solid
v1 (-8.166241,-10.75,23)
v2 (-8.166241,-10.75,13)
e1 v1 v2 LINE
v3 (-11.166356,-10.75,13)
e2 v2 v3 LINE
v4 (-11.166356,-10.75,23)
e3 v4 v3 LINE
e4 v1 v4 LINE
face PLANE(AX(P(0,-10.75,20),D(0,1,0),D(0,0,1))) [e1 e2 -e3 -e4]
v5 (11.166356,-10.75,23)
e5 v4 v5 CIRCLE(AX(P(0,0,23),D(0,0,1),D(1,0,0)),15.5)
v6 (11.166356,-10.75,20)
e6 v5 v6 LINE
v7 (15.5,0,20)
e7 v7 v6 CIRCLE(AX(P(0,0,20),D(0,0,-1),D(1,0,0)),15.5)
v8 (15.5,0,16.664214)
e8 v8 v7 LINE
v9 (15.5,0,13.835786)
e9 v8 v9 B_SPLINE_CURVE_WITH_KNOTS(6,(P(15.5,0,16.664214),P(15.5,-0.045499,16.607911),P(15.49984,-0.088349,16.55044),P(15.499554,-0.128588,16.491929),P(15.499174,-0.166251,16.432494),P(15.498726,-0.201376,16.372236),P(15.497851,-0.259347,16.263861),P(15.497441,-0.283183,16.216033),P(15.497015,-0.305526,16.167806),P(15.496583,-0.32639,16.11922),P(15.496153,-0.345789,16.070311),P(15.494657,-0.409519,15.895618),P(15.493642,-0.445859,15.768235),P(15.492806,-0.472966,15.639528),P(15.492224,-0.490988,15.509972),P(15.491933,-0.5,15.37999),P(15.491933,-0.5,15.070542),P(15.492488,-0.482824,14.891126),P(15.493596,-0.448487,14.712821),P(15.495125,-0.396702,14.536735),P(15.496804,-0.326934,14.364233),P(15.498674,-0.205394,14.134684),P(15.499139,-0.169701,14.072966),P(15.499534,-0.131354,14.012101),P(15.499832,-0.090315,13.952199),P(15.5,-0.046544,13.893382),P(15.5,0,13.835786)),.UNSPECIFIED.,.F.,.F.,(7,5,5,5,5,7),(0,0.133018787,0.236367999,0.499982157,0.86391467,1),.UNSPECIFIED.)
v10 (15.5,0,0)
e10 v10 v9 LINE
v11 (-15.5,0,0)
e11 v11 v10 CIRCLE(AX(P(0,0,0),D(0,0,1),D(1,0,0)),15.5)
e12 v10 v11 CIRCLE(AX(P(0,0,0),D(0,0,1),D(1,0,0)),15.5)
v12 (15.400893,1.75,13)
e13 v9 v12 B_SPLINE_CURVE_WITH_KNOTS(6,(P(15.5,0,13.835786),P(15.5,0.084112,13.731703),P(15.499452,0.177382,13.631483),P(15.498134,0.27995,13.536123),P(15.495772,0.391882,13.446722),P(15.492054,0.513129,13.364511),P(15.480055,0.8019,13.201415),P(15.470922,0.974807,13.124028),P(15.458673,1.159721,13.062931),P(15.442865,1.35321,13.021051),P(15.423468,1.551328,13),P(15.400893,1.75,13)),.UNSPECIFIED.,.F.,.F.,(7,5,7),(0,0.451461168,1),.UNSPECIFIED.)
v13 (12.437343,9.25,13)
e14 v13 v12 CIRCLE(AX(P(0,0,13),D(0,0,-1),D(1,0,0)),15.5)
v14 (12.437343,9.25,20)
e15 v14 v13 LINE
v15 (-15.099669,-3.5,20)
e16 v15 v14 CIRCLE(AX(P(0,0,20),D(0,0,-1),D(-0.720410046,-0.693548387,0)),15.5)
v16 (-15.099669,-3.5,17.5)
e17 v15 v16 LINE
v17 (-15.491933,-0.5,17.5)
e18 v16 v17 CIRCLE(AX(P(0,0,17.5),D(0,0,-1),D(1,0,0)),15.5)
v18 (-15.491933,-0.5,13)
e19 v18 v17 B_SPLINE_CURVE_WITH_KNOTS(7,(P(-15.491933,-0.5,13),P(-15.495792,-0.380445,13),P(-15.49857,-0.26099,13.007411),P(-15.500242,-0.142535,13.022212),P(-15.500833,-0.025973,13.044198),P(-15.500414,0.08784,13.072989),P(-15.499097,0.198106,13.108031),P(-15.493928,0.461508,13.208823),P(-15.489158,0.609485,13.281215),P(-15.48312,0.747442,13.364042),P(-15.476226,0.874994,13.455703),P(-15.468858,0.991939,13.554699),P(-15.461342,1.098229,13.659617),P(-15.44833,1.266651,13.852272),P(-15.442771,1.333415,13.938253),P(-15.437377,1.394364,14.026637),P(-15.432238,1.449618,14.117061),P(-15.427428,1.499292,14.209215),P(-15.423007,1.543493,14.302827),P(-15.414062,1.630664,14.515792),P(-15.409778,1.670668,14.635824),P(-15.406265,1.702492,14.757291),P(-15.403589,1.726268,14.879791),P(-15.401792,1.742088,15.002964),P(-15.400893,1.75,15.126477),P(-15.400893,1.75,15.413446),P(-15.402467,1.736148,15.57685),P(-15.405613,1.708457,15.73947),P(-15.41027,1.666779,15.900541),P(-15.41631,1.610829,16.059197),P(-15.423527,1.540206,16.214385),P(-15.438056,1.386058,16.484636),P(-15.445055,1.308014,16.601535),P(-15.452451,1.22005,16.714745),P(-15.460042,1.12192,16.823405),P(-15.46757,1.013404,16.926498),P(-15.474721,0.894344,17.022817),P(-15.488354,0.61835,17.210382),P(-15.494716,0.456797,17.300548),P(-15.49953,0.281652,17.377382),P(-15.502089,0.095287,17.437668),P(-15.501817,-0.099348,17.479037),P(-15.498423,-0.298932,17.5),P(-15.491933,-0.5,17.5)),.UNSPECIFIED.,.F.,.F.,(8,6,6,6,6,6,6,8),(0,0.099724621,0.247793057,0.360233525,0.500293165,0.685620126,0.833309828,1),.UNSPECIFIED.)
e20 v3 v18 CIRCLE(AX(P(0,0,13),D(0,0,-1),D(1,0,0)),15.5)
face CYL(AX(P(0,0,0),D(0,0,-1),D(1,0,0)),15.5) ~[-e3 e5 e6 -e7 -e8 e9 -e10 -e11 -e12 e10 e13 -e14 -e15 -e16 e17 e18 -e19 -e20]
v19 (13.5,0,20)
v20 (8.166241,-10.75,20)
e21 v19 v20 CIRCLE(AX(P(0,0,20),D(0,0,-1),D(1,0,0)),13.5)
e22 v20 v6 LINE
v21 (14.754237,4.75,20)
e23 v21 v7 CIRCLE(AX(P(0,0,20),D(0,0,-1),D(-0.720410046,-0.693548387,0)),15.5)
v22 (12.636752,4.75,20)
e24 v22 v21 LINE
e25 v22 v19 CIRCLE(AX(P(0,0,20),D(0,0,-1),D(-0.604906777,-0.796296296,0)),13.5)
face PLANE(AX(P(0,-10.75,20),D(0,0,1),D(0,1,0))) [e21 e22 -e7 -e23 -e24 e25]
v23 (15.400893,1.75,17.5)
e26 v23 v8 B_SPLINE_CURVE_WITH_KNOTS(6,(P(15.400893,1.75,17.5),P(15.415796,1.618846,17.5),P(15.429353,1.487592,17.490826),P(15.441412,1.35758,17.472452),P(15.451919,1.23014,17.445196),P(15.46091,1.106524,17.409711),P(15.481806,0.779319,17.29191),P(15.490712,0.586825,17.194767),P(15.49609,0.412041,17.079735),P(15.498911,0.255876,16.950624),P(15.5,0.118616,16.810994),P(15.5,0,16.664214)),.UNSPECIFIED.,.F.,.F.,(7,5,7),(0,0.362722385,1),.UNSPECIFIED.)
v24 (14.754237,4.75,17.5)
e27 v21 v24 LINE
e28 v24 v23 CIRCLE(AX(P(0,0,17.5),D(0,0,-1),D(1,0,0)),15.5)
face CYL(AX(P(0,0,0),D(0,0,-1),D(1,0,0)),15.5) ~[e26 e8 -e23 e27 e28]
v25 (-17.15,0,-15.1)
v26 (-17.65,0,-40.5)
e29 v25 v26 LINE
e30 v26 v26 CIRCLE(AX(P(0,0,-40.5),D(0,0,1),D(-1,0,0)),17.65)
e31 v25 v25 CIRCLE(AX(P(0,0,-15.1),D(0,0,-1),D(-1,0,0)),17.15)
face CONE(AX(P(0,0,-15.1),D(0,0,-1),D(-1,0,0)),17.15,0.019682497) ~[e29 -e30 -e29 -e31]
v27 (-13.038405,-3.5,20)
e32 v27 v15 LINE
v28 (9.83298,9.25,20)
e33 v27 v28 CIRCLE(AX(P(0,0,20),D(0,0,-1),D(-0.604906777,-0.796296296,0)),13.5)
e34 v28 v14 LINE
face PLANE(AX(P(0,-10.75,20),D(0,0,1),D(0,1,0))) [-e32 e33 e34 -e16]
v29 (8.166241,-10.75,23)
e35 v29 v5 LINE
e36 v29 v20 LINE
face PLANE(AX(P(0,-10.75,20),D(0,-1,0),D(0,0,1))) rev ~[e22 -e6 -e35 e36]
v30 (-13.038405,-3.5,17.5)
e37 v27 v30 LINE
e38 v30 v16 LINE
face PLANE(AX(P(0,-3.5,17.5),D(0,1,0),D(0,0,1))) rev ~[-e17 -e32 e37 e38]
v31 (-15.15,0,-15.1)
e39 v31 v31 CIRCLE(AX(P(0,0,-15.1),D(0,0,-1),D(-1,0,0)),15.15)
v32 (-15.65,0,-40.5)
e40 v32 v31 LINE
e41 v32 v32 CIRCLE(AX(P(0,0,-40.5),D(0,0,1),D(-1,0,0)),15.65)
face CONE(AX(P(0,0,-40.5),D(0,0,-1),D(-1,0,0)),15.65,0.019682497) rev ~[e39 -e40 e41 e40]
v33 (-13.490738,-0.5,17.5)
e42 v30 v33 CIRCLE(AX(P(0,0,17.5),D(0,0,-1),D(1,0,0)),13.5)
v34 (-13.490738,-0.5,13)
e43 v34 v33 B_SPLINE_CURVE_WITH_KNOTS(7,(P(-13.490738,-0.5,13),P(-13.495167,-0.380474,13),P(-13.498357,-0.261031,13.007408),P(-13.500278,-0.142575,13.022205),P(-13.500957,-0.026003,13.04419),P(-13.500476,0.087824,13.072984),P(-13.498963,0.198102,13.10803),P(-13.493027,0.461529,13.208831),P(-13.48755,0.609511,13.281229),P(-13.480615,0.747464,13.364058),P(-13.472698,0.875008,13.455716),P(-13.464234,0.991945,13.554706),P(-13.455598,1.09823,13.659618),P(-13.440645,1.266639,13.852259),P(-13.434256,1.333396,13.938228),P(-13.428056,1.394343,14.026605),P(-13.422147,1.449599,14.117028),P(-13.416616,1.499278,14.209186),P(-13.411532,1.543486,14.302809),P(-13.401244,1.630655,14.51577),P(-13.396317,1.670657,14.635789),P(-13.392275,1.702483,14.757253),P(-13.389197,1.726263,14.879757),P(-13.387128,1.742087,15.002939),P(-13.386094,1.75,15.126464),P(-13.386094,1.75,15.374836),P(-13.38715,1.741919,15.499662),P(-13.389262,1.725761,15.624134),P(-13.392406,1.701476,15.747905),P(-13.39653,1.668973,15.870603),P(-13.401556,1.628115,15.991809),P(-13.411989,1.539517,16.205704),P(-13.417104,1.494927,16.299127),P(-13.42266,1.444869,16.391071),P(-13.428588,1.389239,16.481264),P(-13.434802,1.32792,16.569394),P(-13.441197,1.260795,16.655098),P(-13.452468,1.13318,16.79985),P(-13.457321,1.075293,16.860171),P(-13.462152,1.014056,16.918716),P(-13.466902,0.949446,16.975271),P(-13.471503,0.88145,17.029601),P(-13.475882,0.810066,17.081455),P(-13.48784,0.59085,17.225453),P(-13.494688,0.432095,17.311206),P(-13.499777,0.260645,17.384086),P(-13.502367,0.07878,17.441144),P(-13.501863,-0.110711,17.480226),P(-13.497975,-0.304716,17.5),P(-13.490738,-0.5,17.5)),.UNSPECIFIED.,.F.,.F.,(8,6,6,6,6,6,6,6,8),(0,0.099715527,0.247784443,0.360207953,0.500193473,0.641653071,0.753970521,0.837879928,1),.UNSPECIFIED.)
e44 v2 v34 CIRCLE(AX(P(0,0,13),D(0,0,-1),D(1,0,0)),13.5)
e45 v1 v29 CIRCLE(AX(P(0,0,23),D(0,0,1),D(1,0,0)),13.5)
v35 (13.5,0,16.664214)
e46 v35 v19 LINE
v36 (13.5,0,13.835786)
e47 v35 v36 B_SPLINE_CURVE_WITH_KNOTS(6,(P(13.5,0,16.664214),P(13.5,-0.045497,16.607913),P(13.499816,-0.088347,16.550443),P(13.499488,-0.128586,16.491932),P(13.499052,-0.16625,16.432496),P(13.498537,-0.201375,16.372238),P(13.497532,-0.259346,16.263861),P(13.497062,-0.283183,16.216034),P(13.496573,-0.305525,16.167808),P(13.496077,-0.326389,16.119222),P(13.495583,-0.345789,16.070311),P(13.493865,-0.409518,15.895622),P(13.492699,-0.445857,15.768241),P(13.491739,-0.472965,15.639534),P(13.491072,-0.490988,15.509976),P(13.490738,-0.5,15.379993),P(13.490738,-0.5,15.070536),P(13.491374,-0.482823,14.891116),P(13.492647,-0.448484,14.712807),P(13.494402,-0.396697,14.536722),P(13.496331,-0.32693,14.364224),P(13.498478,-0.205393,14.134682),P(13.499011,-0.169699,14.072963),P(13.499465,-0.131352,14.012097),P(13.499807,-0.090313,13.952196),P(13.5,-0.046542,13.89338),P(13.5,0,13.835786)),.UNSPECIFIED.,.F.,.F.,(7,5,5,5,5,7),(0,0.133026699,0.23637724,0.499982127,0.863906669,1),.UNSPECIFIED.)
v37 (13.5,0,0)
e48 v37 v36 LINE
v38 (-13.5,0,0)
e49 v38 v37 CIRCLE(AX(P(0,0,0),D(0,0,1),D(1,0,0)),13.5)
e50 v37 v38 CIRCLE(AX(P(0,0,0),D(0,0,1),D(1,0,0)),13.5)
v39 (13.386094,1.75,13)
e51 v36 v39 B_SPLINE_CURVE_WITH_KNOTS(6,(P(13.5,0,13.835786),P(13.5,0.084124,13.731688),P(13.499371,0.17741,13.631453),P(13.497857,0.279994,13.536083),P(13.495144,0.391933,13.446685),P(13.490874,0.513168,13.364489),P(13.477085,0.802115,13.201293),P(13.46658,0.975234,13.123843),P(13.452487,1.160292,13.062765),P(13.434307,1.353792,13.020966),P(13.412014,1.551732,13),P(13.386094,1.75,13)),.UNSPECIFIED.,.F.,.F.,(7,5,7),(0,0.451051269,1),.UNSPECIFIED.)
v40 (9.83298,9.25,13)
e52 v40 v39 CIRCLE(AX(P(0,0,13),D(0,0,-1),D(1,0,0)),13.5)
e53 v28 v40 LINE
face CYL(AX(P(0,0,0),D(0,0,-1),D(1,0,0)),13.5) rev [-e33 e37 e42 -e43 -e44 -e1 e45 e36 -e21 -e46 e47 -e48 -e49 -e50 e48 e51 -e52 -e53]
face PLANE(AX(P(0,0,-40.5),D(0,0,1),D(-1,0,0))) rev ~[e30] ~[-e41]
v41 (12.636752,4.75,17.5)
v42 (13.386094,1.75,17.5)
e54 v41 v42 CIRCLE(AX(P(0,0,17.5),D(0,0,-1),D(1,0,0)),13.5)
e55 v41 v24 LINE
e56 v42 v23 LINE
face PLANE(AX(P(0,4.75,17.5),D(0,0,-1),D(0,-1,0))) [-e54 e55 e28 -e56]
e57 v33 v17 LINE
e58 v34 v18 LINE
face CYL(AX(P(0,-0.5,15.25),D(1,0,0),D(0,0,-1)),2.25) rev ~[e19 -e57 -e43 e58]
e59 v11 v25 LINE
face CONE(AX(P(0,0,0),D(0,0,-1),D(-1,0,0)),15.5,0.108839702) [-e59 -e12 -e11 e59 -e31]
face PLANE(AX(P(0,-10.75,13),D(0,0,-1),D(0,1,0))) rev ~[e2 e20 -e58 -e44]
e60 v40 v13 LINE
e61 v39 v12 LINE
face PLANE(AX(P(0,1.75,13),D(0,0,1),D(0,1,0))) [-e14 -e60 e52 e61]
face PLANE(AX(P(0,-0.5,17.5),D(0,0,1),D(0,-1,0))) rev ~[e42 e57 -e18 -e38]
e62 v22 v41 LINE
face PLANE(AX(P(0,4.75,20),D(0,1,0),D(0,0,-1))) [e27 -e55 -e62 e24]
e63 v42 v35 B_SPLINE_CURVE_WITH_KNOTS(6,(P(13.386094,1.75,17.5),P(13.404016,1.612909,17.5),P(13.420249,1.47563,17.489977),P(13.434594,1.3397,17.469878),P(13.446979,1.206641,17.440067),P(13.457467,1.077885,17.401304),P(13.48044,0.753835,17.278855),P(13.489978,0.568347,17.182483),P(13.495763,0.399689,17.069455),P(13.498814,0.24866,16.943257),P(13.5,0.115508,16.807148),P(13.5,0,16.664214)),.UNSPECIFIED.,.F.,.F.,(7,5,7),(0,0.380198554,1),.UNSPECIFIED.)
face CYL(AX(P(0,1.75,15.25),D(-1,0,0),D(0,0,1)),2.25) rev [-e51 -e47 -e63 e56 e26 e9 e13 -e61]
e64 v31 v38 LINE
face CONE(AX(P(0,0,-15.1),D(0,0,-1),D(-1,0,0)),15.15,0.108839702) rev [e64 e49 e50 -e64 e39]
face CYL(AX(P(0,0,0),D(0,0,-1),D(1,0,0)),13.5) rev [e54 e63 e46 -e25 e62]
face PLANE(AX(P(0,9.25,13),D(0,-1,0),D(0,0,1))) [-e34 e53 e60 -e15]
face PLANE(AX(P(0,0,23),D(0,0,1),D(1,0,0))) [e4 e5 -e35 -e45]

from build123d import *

# Parameters (mm, degrees)
F0_R          = 15.5
F0_R_2        = 13.5
F1_DEPTH      = 23
F2_W          = 26.25
F2_H          = 3
F3_DEPTH      = 62
F3_DEPTH_BACK = 62
F6_REACH      = 29.8275487819
F7_REACH      = 27.5036039842


# Not quite as in the source:
# - an extrude ends at something that could not be found from the text; its depth is read off the source's solid


with BuildPart() as f1:
    # F0 (on Top) → F1 (new body)
    with BuildSketch(Plane.XY):
        Circle(F0_R)
        Circle(F0_R_2, mode=Mode.SUBTRACT)
    extrude(amount=F1_DEPTH)

    # F2 (on Right) → F3 (cut, two sides)
    with BuildSketch(Plane.YZ) as f3_sk:
        with Locations((2.375, 21.5)):
            Rectangle(F2_W, F2_H)
    extrude(amount=-F3_DEPTH, mode=Mode.SUBTRACT)
    extrude(f3_sk.sketch, amount=F3_DEPTH_BACK, mode=Mode.SUBTRACT)

    f6_end = f1.faces().sort_by_distance((-15.5, 0, 11.5))[0]
    # F4 (on Right) → F6 (cut, up to a face of the model that its end follows)
    with BuildSketch(Plane.YZ):
        with BuildLine():
            Line((-3.5, 20), (-10.75, 20))
            Line((-10.75, 20), (-10.75, 13))
            Line((-10.75, 13), (-0.5, 13))
            ThreePointArc((-0.5, 13), (1.75, 15.25), (-0.5, 17.5))
            Line((-0.5, 17.5), (-3.5, 17.5))
            Line((-3.5, 17.5), (-3.5, 20))
        make_face()
    f6_long = extrude(amount=-F6_REACH, mode=Mode.PRIVATE)
    add(split(f6_long, bisect_by=f6_end, keep=Keep.BOTTOM, mode=Mode.PRIVATE), mode=Mode.SUBTRACT)

    f7_end = f1.faces().sort_by_distance((-15.5, 0, 11.5))[0]
    # F5 (on Right) → F7 (cut, up to a face of the model that its end follows)
    with BuildSketch(Plane.YZ):
        with BuildLine():
            Line((4.75, 20), (4.75, 17.5))
            Line((4.75, 17.5), (1.75, 17.5))
            ThreePointArc((1.75, 17.5), (-0.5, 15.25), (1.75, 13))
            Line((1.75, 13), (9.25, 13))
            Line((9.25, 13), (9.25, 20))
            Line((9.25, 20), (4.75, 20))
        make_face()
    f7_long = extrude(amount=F7_REACH, mode=Mode.PRIVATE)
    add(split(f7_long, bisect_by=f7_end, keep=Keep.BOTTOM, mode=Mode.PRIVATE), mode=Mode.SUBTRACT)

    # F10 (on Front) → F11 (revolve)
    with BuildSketch(Plane.XZ):
        Polygon((-15.15, -15.1), (-13.5, 0), (-15.5, 0), (-17.15, -15.1), align=None)
    revolve(axis=Axis((0, 0, -0.5375670735), (0, 0, -1)))

    # F14 (on Front) → F15 (revolve)
    with BuildSketch(Plane.XZ):
        Polygon((-15.15, -15.1), (-17.15, -15.1), (-17.65, -40.5), (-15.65, -40.5), align=None)
    revolve(axis=Axis((0, 0, -27.8), (0, 0, 1)))


solid = f1.part
